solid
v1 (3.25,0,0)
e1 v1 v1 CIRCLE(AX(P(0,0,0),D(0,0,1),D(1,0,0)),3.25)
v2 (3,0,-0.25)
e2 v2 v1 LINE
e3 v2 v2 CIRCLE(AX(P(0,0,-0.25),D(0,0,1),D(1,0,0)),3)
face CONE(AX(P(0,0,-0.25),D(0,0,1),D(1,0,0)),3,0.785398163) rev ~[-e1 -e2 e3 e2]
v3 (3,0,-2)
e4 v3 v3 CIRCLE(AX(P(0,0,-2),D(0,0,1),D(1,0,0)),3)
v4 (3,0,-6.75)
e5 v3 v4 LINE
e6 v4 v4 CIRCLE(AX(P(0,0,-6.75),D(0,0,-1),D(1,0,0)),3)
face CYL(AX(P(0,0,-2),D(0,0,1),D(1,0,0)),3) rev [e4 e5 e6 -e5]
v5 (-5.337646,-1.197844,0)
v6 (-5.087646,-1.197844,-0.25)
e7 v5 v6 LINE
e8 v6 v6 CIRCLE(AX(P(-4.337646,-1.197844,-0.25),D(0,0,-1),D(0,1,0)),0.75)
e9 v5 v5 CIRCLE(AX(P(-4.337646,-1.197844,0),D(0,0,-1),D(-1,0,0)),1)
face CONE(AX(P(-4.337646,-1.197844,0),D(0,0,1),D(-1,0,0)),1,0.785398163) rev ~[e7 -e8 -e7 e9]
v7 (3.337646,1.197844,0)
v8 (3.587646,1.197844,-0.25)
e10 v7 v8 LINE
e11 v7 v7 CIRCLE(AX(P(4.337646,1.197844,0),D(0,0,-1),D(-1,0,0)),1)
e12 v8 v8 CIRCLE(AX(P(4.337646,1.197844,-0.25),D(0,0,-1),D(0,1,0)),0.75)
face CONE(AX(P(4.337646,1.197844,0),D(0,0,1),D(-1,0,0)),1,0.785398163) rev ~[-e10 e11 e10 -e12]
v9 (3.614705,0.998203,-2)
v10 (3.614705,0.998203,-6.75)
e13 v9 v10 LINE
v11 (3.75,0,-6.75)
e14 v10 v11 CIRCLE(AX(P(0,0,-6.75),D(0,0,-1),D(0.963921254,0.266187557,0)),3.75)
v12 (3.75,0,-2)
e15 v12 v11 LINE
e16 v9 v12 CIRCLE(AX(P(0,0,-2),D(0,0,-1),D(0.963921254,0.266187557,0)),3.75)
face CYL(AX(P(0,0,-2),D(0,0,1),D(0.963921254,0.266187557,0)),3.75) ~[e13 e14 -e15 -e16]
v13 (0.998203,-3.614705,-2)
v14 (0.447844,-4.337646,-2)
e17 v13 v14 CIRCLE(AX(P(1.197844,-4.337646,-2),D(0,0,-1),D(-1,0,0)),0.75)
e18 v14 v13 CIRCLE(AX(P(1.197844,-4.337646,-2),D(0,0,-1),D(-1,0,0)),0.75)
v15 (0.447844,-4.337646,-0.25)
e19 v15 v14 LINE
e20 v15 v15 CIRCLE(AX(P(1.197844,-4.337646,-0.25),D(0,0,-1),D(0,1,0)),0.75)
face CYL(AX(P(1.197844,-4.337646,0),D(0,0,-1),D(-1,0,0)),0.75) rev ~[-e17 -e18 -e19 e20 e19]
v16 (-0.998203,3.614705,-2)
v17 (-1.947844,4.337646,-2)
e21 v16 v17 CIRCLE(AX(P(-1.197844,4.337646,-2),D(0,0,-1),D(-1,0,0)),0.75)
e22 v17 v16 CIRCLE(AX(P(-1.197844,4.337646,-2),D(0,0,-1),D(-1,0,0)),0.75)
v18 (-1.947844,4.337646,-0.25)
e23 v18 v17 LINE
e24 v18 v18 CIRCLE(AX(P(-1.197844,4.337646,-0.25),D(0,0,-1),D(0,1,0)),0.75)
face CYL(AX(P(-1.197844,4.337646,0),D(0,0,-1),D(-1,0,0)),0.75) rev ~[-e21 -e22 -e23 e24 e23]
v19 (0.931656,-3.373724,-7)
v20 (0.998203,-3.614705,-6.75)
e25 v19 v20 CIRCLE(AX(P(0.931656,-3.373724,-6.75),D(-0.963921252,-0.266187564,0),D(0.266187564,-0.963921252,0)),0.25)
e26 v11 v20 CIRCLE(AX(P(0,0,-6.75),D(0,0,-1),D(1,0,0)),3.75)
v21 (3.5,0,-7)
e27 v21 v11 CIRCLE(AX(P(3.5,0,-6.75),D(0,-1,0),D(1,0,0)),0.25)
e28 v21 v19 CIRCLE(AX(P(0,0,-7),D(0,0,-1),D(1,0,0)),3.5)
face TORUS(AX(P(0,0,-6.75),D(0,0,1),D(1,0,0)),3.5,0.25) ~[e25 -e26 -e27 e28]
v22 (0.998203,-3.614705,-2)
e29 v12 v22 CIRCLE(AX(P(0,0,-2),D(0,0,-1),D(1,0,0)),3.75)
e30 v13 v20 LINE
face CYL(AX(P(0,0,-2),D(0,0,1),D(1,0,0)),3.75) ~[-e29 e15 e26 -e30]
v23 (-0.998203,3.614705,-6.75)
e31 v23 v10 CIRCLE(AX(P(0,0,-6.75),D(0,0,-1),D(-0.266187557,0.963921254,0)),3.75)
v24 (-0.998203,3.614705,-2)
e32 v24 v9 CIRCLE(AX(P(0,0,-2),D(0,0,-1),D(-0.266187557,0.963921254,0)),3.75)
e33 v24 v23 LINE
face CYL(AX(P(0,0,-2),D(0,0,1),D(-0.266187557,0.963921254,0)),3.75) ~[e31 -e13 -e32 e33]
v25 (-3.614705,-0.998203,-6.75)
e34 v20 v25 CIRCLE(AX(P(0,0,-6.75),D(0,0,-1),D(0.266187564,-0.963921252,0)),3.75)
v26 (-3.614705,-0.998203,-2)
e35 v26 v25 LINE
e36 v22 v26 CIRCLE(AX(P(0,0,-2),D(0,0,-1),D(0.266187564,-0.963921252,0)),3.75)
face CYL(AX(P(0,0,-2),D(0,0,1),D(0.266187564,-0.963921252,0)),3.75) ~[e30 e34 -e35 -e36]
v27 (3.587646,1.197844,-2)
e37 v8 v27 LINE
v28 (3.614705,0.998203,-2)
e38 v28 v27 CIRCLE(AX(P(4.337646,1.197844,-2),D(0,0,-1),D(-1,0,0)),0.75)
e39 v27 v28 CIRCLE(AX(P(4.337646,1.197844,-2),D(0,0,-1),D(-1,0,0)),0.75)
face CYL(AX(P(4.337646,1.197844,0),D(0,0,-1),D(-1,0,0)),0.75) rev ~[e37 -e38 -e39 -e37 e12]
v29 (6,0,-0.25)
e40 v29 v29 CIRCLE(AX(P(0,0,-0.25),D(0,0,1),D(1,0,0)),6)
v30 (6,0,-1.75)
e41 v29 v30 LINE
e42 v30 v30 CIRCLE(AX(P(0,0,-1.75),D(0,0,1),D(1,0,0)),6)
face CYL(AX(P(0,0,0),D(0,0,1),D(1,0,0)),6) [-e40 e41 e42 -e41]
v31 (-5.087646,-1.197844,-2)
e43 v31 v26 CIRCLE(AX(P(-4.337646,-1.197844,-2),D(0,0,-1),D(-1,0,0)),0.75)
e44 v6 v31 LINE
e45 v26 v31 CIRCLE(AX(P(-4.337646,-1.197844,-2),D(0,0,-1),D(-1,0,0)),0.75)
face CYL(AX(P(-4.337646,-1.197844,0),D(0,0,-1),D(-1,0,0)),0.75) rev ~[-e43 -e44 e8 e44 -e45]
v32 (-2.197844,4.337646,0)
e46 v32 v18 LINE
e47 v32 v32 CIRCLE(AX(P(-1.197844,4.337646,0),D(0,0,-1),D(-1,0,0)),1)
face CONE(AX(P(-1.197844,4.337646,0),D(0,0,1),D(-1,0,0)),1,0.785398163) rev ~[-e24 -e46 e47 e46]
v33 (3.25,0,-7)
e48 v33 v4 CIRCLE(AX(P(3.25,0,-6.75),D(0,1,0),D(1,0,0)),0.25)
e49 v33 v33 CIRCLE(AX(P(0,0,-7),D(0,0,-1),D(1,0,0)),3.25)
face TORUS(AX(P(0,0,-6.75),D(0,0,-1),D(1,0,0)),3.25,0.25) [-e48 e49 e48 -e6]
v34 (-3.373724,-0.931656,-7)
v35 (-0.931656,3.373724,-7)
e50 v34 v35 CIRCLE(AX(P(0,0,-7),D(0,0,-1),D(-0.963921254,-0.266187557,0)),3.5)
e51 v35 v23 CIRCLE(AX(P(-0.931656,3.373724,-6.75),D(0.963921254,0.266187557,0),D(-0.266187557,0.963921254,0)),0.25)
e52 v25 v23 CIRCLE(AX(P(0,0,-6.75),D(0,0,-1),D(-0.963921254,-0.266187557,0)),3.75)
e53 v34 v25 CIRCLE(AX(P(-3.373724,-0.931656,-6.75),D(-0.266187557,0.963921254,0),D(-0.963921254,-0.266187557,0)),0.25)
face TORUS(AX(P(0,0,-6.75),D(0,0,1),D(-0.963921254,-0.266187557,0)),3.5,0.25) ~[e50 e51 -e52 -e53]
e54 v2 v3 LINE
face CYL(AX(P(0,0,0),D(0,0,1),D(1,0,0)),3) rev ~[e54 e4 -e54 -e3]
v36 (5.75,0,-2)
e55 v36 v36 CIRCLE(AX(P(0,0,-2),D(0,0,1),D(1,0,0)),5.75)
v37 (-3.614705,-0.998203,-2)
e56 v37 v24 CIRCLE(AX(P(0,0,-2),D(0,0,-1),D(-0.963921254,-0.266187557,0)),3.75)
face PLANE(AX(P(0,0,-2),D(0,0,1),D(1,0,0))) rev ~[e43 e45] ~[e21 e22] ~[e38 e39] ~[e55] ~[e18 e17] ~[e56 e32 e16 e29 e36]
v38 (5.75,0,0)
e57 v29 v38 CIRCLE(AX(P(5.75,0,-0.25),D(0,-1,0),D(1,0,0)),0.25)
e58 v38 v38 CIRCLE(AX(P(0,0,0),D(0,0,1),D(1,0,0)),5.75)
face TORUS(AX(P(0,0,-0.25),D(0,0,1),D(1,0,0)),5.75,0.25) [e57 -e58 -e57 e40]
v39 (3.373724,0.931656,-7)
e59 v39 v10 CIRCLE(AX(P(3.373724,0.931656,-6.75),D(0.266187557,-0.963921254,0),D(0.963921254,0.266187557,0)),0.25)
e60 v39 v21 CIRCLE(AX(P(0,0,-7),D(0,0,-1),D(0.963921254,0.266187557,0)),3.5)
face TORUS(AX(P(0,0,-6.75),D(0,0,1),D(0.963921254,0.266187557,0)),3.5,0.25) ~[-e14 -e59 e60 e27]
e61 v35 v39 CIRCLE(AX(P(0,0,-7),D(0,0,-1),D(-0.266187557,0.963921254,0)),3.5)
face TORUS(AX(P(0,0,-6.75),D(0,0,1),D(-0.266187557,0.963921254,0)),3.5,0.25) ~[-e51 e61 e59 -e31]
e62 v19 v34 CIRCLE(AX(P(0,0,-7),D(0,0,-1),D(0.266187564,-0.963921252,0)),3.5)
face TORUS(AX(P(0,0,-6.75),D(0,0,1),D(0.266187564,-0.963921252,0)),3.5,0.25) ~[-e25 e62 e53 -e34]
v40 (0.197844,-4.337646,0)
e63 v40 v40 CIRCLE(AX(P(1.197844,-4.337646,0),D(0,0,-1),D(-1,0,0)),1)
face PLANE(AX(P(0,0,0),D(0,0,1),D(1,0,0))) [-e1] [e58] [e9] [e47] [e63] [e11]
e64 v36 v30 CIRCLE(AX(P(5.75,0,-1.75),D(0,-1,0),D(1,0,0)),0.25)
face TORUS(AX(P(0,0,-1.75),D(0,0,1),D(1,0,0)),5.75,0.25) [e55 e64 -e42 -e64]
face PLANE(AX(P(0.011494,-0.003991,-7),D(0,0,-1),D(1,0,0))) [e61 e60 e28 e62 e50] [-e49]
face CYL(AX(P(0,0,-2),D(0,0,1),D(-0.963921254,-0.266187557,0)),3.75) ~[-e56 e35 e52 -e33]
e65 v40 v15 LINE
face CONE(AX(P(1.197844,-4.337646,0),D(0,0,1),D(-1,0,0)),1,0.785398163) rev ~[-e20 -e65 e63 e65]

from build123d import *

# Parameters (mm, degrees)
F0_R           = 6
F0_R_2         = 3
F1_DEPTH       = 2
F2_D           = 1.5
F2_CSINK_D     = 2
F2_CSINK_ANGLE = 90
F3_SIZE        = 0.25
F4_R           = 3
F5_DEPTH       = 5
F6_R           = 0.25
F7_R           = 0.25


with BuildPart() as f1:
    # F0 (on Top) → F1 (new body)
    with BuildSketch(Plane.XY):
        Circle(F0_R)
        Circle(F0_R_2, mode=Mode.SUBTRACT)
    extrude(amount=-F1_DEPTH)

    # F2 (through all)
    with Locations(Plane.XY):
        with Locations((-1.1978440184, 4.3376456411), (1.1978440184, -4.3376456411), (-4.3376456411, -1.1978440184), (4.3376456411, 1.1978440184)):
            CounterSinkHole(F2_D / 2, F2_CSINK_D / 2, counter_sink_angle=F2_CSINK_ANGLE)

    # F3
    f3_edges = [f1.edges().sort_by_distance(p)[0] for p in [
        (-3, 0, 0),
    ]]
    chamfer(f3_edges, length=F3_SIZE)

    # F4 (on face) → F5 (join)
    with BuildSketch(Plane(origin=(0, 0, -2), x_dir=(1, 0, 0), z_dir=(0, 0, -1))):
        with BuildLine():
            ThreePointArc((3.6147047033, -0.99820334), (3.7160222441, -0.5036652473), (3.75, 0))
            ThreePointArc((3.75, 0), (2.9837696475, 2.2714794057), (0.9982033651, 3.6147046964))
            ThreePointArc((0.9982033651, 3.6147046964), (-1.8501458456, 3.2618185648), (-3.6147047033, 0.99820334))
            ThreePointArc((-3.6147047033, 0.99820334), (-3.2618185584, -1.850145857), (-0.99820334, -3.6147047033))
            ThreePointArc((-0.99820334, -3.6147047033), (1.850145857, -3.2618185584), (3.6147047033, -0.99820334))
        make_face()
        Circle(F4_R, mode=Mode.SUBTRACT)
    extrude(amount=F5_DEPTH)

    # F6
    f6_edges = [f1.edges().sort_by_distance(p)[0] for p in [
        (-3, 0, -7),
        (-3.614705, -0.998203, -7),
    ]]
    fillet(f6_edges, radius=F6_R)

    # F7
    f7_edges = [f1.edges().sort_by_distance(p)[0] for p in [
        (-6, 0, 0),
        (-6, 0, -2),
    ]]
    fillet(f7_edges, radius=F7_R)


solid = f1.part
